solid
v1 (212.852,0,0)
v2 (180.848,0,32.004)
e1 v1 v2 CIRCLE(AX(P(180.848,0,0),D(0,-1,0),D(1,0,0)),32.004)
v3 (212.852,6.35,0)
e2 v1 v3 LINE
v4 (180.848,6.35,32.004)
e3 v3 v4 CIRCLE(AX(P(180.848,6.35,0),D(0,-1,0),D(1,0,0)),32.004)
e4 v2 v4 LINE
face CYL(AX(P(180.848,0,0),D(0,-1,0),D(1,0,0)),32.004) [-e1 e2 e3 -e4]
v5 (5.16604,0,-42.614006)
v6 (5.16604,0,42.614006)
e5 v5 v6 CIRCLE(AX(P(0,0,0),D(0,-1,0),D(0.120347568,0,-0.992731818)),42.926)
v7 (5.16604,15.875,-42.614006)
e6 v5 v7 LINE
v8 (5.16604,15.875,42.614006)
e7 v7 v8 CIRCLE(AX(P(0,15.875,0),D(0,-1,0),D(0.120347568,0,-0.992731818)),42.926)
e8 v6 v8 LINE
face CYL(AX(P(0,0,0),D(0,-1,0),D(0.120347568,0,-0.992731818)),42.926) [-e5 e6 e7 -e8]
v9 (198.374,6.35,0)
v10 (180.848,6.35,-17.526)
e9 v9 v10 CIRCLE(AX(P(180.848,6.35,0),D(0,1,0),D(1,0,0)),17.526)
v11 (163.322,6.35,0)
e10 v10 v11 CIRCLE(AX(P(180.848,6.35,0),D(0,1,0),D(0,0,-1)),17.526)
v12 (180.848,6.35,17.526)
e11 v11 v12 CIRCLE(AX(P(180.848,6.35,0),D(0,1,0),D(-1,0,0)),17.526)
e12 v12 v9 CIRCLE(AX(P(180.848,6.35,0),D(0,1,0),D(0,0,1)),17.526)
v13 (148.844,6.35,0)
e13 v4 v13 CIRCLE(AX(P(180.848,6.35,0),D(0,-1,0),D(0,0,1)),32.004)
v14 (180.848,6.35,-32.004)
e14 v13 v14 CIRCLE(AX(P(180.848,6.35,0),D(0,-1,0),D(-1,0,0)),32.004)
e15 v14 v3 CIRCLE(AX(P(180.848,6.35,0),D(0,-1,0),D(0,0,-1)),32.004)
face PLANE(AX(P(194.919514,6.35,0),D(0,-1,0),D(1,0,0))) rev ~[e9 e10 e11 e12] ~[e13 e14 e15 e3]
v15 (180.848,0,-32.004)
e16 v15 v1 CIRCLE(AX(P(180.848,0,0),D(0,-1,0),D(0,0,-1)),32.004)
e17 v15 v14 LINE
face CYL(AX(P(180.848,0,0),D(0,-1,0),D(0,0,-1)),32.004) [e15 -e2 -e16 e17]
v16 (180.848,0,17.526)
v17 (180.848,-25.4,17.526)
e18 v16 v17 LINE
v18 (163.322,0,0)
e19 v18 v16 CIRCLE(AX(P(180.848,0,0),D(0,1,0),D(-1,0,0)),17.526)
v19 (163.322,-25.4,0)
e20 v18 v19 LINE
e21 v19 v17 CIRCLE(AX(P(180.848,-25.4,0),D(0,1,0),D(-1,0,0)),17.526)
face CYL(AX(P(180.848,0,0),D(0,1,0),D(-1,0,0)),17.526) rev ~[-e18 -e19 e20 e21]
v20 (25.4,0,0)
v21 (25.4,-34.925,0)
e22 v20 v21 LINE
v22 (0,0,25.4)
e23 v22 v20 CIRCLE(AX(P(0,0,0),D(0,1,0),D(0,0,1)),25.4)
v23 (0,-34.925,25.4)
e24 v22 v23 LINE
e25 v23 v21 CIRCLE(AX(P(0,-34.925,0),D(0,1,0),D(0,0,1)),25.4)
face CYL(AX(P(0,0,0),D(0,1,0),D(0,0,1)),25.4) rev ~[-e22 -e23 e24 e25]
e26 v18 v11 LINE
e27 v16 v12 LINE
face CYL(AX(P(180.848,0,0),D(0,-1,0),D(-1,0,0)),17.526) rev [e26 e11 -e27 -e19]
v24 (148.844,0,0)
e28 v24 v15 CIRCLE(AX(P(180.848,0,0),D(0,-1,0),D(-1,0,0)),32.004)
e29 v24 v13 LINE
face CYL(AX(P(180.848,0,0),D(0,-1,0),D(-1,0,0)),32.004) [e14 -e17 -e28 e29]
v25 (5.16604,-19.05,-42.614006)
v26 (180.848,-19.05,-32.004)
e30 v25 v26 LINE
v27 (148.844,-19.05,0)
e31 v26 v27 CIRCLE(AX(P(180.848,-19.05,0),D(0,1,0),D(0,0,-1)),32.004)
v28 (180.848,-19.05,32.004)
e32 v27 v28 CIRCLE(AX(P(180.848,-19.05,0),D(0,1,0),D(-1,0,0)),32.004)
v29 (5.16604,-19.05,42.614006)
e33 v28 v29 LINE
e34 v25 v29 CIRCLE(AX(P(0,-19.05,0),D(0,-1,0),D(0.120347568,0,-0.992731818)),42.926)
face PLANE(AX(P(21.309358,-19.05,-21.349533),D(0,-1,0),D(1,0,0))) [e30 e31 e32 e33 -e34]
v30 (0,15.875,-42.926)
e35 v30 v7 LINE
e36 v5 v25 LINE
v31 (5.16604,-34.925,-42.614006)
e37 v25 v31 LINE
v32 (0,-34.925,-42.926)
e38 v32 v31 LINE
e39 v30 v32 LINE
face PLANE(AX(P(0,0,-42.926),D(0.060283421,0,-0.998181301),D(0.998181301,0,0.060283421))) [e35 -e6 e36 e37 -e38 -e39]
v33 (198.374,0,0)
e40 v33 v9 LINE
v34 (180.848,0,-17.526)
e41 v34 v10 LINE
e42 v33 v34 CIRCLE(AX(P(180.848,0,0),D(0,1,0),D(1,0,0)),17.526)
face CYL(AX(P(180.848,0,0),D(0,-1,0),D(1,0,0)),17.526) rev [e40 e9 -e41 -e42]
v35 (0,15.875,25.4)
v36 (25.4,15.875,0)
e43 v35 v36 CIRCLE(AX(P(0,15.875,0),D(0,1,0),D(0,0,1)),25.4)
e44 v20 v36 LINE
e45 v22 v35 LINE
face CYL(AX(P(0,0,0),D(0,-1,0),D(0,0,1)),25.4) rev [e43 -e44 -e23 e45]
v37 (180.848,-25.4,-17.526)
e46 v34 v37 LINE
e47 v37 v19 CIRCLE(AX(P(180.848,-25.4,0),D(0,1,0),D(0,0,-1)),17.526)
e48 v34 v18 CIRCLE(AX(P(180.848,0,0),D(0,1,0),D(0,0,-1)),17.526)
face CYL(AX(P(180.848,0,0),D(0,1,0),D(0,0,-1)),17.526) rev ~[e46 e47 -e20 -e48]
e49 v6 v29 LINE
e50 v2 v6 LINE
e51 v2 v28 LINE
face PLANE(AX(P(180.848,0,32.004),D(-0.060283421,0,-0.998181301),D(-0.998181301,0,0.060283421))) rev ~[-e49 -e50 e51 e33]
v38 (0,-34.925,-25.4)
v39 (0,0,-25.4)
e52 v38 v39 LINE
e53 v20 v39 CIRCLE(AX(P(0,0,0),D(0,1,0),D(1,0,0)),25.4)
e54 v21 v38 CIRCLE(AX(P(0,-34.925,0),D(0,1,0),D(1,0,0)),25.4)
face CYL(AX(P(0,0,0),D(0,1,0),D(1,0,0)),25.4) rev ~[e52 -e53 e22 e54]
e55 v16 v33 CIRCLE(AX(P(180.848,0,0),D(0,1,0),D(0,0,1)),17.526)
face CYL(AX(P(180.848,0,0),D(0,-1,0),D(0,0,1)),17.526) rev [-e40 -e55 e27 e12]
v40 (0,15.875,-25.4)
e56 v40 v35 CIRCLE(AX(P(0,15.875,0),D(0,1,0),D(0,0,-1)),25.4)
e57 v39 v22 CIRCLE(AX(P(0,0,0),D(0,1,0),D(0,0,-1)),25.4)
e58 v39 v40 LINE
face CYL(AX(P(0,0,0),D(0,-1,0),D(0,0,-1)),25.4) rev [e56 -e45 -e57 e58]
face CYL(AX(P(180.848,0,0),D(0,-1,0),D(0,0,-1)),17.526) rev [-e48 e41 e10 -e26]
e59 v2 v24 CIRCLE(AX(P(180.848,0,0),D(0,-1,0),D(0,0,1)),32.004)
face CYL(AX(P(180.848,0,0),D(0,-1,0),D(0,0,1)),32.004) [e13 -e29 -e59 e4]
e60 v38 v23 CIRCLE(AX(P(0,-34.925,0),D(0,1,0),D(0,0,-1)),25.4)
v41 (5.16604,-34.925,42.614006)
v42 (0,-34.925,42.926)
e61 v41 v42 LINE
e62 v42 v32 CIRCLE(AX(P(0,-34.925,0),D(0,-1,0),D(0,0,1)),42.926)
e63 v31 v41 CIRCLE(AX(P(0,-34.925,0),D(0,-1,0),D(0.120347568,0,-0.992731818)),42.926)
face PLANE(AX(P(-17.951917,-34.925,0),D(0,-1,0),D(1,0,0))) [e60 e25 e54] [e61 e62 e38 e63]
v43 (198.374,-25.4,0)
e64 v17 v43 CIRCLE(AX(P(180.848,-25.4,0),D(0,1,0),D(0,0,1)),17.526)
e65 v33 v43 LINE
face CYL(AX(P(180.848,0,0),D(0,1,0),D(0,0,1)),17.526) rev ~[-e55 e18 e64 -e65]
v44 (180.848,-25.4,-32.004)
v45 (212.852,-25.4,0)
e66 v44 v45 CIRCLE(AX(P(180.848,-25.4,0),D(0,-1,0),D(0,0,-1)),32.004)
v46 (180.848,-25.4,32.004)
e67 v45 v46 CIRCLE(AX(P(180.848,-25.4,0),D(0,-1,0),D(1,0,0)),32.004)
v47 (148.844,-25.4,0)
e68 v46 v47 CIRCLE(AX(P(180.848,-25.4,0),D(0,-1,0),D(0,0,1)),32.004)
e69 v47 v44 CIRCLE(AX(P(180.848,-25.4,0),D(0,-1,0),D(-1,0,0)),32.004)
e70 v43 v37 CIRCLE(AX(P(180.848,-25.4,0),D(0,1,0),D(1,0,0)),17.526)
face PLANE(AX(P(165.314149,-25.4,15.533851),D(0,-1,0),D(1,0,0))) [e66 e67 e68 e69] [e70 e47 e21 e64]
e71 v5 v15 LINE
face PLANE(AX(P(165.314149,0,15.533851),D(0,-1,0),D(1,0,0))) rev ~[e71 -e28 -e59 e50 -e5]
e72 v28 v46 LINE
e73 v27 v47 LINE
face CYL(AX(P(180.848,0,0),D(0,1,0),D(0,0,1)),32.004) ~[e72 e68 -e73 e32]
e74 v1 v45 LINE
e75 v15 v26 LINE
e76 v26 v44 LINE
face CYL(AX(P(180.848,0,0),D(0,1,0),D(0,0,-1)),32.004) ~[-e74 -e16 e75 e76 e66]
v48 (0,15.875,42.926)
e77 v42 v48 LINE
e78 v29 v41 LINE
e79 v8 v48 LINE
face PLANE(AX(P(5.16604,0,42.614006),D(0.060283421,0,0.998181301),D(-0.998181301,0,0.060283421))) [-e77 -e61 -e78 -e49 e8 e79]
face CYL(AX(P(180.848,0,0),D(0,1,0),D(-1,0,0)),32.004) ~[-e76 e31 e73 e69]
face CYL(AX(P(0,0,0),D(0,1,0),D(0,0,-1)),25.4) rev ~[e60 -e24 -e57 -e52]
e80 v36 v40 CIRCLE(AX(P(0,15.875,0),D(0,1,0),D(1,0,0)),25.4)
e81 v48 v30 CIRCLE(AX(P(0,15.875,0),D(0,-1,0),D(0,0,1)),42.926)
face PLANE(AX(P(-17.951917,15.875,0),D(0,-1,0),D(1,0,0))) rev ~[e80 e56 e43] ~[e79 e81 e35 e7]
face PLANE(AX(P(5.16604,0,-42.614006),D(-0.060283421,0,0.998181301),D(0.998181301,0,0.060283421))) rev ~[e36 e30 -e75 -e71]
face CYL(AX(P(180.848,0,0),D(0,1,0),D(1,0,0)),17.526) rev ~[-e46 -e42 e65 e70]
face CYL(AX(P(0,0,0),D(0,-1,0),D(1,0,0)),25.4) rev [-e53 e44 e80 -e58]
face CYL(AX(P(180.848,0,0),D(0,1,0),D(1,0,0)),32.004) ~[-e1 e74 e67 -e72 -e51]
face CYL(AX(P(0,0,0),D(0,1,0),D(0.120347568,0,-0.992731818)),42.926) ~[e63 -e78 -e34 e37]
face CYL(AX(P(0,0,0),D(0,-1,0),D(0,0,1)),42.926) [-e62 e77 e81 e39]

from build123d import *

# Parameters (mm, degrees)
F1_DEPTH = 19.05
F2_DEPTH = 34.925
F3_DEPTH = 25.4
F4_DEPTH = 6.35
F5_DEPTH = 15.875


with BuildPart() as f1:
    # F0 (on Front) → F1 (new body)
    with BuildSketch(Plane.XZ):
        with BuildLine():
            Line((0, -25.4), (0, -42.926))
            Line((0, -42.926), (5.16603969, -42.61400603))
            ThreePointArc((5.16603969, -42.61400603), (32.1278609289, -28.4682635251), (42.926, 0))
            Line((42.926, 0), (25.4, 0))
            ThreePointArc((25.4, 0), (17.9605122421, -17.9605122421), (0, -25.4))
        make_face()
        with BuildLine():
            Line((180.848, 32.004), (5.16603969, 42.61400603))
            ThreePointArc((5.16603969, 42.61400603), (32.1278609289, 28.4682635251), (42.926, 0))
            Line((42.926, 0), (148.844, 0))
            ThreePointArc((148.844, 0), (158.2177545749, 22.6302454251), (180.848, 32.004))
        make_face()
        with BuildLine():
            ThreePointArc((42.926, 0), (32.1278609289, -28.4682635251), (5.16603969, -42.61400603))
            Line((5.16603969, -42.61400603), (180.848, -32.004))
            ThreePointArc((180.848, -32.004), (158.2177545749, -22.6302454251), (148.844, 0))
            Line((148.844, 0), (42.926, 0))
        make_face()
    extrude(amount=F1_DEPTH)

    # F0 (on Front) → F2 (join)
    with BuildSketch(Plane.XZ):
        with BuildLine():
            Line((0, 25.4), (0, 42.926))
            ThreePointArc((0, 42.926), (-42.926, 0), (0, -42.926))
            Line((0, -42.926), (0, -25.4))
            ThreePointArc((0, -25.4), (-25.4, 0), (0, 25.4))
        make_face()
        with BuildLine():
            Line((5.16603969, 42.61400603), (0, 42.926))
            Line((0, 42.926), (0, 25.4))
            ThreePointArc((0, 25.4), (17.9605122421, 17.9605122421), (25.4, 0))
            Line((25.4, 0), (42.926, 0))
            ThreePointArc((42.926, 0), (32.1278609289, 28.4682635251), (5.16603969, 42.61400603))
        make_face()
        with BuildLine():
            Line((0, -25.4), (0, -42.926))
            Line((0, -42.926), (5.16603969, -42.61400603))
            ThreePointArc((5.16603969, -42.61400603), (32.1278609289, -28.4682635251), (42.926, 0))
            Line((42.926, 0), (25.4, 0))
            ThreePointArc((25.4, 0), (17.9605122421, -17.9605122421), (0, -25.4))
        make_face()
    extrude(amount=F2_DEPTH)

    # F0 (on Front) → F3 (join)
    with BuildSketch(Plane.XZ):
        with BuildLine():
            Line((180.848, 17.526), (180.848, 32.004))
            ThreePointArc((180.848, 32.004), (158.2177545749, 22.6302454251), (148.844, 0))
            Line((148.844, 0), (163.322, 0))
            ThreePointArc((163.322, 0), (168.4552465529, 12.3927534471), (180.848, 17.526))
        make_face()
        with BuildLine():
            ThreePointArc((148.844, 0), (158.2177545749, -22.6302454251), (180.848, -32.004))
            Line((180.848, -32.004), (180.848, -17.526))
            ThreePointArc((180.848, -17.526), (168.4552465529, -12.3927534471), (163.322, 0))
            Line((163.322, 0), (148.844, 0))
        make_face()
        with BuildLine():
            ThreePointArc((212.852, 0), (203.4782454251, 22.6302454251), (180.848, 32.004))
            Line((180.848, 32.004), (180.848, 17.526))
            ThreePointArc((180.848, 17.526), (193.2407534471, 12.3927534471), (198.374, 0))
            ThreePointArc((198.374, 0), (193.2407534471, -12.3927534471), (180.848, -17.526))
            Line((180.848, -17.526), (180.848, -32.004))
            ThreePointArc((180.848, -32.004), (203.4782454251, -22.6302454251), (212.852, 0))
        make_face()
    extrude(amount=F3_DEPTH)

    # F0 (on Front) → F4 (join)
    with BuildSketch(Plane.XZ):
        with BuildLine():
            ThreePointArc((212.852, 0), (203.4782454251, 22.6302454251), (180.848, 32.004))
            Line((180.848, 32.004), (180.848, 17.526))
            ThreePointArc((180.848, 17.526), (193.2407534471, 12.3927534471), (198.374, 0))
            ThreePointArc((198.374, 0), (193.2407534471, -12.3927534471), (180.848, -17.526))
            Line((180.848, -17.526), (180.848, -32.004))
            ThreePointArc((180.848, -32.004), (203.4782454251, -22.6302454251), (212.852, 0))
        make_face()
        with BuildLine():
            ThreePointArc((148.844, 0), (158.2177545749, -22.6302454251), (180.848, -32.004))
            Line((180.848, -32.004), (180.848, -17.526))
            ThreePointArc((180.848, -17.526), (168.4552465529, -12.3927534471), (163.322, 0))
            Line((163.322, 0), (148.844, 0))
        make_face()
        with BuildLine():
            Line((180.848, 17.526), (180.848, 32.004))
            ThreePointArc((180.848, 32.004), (158.2177545749, 22.6302454251), (148.844, 0))
            Line((148.844, 0), (163.322, 0))
            ThreePointArc((163.322, 0), (168.4552465529, 12.3927534471), (180.848, 17.526))
        make_face()
    extrude(amount=-F4_DEPTH)

    # F0 (on Front) → F5 (join)
    with BuildSketch(Plane.XZ):
        with BuildLine():
            Line((0, 25.4), (0, 42.926))
            ThreePointArc((0, 42.926), (-42.926, 0), (0, -42.926))
            Line((0, -42.926), (0, -25.4))
            ThreePointArc((0, -25.4), (-25.4, 0), (0, 25.4))
        make_face()
        with BuildLine():
            Line((5.16603969, 42.61400603), (0, 42.926))
            Line((0, 42.926), (0, 25.4))
            ThreePointArc((0, 25.4), (17.9605122421, 17.9605122421), (25.4, 0))
            Line((25.4, 0), (42.926, 0))
            ThreePointArc((42.926, 0), (32.1278609289, 28.4682635251), (5.16603969, 42.61400603))
        make_face()
        with BuildLine():
            Line((0, -25.4), (0, -42.926))
            Line((0, -42.926), (5.16603969, -42.61400603))
            ThreePointArc((5.16603969, -42.61400603), (32.1278609289, -28.4682635251), (42.926, 0))
            Line((42.926, 0), (25.4, 0))
            ThreePointArc((25.4, 0), (17.9605122421, -17.9605122421), (0, -25.4))
        make_face()
    extrude(amount=-F5_DEPTH)


solid = f1.part
